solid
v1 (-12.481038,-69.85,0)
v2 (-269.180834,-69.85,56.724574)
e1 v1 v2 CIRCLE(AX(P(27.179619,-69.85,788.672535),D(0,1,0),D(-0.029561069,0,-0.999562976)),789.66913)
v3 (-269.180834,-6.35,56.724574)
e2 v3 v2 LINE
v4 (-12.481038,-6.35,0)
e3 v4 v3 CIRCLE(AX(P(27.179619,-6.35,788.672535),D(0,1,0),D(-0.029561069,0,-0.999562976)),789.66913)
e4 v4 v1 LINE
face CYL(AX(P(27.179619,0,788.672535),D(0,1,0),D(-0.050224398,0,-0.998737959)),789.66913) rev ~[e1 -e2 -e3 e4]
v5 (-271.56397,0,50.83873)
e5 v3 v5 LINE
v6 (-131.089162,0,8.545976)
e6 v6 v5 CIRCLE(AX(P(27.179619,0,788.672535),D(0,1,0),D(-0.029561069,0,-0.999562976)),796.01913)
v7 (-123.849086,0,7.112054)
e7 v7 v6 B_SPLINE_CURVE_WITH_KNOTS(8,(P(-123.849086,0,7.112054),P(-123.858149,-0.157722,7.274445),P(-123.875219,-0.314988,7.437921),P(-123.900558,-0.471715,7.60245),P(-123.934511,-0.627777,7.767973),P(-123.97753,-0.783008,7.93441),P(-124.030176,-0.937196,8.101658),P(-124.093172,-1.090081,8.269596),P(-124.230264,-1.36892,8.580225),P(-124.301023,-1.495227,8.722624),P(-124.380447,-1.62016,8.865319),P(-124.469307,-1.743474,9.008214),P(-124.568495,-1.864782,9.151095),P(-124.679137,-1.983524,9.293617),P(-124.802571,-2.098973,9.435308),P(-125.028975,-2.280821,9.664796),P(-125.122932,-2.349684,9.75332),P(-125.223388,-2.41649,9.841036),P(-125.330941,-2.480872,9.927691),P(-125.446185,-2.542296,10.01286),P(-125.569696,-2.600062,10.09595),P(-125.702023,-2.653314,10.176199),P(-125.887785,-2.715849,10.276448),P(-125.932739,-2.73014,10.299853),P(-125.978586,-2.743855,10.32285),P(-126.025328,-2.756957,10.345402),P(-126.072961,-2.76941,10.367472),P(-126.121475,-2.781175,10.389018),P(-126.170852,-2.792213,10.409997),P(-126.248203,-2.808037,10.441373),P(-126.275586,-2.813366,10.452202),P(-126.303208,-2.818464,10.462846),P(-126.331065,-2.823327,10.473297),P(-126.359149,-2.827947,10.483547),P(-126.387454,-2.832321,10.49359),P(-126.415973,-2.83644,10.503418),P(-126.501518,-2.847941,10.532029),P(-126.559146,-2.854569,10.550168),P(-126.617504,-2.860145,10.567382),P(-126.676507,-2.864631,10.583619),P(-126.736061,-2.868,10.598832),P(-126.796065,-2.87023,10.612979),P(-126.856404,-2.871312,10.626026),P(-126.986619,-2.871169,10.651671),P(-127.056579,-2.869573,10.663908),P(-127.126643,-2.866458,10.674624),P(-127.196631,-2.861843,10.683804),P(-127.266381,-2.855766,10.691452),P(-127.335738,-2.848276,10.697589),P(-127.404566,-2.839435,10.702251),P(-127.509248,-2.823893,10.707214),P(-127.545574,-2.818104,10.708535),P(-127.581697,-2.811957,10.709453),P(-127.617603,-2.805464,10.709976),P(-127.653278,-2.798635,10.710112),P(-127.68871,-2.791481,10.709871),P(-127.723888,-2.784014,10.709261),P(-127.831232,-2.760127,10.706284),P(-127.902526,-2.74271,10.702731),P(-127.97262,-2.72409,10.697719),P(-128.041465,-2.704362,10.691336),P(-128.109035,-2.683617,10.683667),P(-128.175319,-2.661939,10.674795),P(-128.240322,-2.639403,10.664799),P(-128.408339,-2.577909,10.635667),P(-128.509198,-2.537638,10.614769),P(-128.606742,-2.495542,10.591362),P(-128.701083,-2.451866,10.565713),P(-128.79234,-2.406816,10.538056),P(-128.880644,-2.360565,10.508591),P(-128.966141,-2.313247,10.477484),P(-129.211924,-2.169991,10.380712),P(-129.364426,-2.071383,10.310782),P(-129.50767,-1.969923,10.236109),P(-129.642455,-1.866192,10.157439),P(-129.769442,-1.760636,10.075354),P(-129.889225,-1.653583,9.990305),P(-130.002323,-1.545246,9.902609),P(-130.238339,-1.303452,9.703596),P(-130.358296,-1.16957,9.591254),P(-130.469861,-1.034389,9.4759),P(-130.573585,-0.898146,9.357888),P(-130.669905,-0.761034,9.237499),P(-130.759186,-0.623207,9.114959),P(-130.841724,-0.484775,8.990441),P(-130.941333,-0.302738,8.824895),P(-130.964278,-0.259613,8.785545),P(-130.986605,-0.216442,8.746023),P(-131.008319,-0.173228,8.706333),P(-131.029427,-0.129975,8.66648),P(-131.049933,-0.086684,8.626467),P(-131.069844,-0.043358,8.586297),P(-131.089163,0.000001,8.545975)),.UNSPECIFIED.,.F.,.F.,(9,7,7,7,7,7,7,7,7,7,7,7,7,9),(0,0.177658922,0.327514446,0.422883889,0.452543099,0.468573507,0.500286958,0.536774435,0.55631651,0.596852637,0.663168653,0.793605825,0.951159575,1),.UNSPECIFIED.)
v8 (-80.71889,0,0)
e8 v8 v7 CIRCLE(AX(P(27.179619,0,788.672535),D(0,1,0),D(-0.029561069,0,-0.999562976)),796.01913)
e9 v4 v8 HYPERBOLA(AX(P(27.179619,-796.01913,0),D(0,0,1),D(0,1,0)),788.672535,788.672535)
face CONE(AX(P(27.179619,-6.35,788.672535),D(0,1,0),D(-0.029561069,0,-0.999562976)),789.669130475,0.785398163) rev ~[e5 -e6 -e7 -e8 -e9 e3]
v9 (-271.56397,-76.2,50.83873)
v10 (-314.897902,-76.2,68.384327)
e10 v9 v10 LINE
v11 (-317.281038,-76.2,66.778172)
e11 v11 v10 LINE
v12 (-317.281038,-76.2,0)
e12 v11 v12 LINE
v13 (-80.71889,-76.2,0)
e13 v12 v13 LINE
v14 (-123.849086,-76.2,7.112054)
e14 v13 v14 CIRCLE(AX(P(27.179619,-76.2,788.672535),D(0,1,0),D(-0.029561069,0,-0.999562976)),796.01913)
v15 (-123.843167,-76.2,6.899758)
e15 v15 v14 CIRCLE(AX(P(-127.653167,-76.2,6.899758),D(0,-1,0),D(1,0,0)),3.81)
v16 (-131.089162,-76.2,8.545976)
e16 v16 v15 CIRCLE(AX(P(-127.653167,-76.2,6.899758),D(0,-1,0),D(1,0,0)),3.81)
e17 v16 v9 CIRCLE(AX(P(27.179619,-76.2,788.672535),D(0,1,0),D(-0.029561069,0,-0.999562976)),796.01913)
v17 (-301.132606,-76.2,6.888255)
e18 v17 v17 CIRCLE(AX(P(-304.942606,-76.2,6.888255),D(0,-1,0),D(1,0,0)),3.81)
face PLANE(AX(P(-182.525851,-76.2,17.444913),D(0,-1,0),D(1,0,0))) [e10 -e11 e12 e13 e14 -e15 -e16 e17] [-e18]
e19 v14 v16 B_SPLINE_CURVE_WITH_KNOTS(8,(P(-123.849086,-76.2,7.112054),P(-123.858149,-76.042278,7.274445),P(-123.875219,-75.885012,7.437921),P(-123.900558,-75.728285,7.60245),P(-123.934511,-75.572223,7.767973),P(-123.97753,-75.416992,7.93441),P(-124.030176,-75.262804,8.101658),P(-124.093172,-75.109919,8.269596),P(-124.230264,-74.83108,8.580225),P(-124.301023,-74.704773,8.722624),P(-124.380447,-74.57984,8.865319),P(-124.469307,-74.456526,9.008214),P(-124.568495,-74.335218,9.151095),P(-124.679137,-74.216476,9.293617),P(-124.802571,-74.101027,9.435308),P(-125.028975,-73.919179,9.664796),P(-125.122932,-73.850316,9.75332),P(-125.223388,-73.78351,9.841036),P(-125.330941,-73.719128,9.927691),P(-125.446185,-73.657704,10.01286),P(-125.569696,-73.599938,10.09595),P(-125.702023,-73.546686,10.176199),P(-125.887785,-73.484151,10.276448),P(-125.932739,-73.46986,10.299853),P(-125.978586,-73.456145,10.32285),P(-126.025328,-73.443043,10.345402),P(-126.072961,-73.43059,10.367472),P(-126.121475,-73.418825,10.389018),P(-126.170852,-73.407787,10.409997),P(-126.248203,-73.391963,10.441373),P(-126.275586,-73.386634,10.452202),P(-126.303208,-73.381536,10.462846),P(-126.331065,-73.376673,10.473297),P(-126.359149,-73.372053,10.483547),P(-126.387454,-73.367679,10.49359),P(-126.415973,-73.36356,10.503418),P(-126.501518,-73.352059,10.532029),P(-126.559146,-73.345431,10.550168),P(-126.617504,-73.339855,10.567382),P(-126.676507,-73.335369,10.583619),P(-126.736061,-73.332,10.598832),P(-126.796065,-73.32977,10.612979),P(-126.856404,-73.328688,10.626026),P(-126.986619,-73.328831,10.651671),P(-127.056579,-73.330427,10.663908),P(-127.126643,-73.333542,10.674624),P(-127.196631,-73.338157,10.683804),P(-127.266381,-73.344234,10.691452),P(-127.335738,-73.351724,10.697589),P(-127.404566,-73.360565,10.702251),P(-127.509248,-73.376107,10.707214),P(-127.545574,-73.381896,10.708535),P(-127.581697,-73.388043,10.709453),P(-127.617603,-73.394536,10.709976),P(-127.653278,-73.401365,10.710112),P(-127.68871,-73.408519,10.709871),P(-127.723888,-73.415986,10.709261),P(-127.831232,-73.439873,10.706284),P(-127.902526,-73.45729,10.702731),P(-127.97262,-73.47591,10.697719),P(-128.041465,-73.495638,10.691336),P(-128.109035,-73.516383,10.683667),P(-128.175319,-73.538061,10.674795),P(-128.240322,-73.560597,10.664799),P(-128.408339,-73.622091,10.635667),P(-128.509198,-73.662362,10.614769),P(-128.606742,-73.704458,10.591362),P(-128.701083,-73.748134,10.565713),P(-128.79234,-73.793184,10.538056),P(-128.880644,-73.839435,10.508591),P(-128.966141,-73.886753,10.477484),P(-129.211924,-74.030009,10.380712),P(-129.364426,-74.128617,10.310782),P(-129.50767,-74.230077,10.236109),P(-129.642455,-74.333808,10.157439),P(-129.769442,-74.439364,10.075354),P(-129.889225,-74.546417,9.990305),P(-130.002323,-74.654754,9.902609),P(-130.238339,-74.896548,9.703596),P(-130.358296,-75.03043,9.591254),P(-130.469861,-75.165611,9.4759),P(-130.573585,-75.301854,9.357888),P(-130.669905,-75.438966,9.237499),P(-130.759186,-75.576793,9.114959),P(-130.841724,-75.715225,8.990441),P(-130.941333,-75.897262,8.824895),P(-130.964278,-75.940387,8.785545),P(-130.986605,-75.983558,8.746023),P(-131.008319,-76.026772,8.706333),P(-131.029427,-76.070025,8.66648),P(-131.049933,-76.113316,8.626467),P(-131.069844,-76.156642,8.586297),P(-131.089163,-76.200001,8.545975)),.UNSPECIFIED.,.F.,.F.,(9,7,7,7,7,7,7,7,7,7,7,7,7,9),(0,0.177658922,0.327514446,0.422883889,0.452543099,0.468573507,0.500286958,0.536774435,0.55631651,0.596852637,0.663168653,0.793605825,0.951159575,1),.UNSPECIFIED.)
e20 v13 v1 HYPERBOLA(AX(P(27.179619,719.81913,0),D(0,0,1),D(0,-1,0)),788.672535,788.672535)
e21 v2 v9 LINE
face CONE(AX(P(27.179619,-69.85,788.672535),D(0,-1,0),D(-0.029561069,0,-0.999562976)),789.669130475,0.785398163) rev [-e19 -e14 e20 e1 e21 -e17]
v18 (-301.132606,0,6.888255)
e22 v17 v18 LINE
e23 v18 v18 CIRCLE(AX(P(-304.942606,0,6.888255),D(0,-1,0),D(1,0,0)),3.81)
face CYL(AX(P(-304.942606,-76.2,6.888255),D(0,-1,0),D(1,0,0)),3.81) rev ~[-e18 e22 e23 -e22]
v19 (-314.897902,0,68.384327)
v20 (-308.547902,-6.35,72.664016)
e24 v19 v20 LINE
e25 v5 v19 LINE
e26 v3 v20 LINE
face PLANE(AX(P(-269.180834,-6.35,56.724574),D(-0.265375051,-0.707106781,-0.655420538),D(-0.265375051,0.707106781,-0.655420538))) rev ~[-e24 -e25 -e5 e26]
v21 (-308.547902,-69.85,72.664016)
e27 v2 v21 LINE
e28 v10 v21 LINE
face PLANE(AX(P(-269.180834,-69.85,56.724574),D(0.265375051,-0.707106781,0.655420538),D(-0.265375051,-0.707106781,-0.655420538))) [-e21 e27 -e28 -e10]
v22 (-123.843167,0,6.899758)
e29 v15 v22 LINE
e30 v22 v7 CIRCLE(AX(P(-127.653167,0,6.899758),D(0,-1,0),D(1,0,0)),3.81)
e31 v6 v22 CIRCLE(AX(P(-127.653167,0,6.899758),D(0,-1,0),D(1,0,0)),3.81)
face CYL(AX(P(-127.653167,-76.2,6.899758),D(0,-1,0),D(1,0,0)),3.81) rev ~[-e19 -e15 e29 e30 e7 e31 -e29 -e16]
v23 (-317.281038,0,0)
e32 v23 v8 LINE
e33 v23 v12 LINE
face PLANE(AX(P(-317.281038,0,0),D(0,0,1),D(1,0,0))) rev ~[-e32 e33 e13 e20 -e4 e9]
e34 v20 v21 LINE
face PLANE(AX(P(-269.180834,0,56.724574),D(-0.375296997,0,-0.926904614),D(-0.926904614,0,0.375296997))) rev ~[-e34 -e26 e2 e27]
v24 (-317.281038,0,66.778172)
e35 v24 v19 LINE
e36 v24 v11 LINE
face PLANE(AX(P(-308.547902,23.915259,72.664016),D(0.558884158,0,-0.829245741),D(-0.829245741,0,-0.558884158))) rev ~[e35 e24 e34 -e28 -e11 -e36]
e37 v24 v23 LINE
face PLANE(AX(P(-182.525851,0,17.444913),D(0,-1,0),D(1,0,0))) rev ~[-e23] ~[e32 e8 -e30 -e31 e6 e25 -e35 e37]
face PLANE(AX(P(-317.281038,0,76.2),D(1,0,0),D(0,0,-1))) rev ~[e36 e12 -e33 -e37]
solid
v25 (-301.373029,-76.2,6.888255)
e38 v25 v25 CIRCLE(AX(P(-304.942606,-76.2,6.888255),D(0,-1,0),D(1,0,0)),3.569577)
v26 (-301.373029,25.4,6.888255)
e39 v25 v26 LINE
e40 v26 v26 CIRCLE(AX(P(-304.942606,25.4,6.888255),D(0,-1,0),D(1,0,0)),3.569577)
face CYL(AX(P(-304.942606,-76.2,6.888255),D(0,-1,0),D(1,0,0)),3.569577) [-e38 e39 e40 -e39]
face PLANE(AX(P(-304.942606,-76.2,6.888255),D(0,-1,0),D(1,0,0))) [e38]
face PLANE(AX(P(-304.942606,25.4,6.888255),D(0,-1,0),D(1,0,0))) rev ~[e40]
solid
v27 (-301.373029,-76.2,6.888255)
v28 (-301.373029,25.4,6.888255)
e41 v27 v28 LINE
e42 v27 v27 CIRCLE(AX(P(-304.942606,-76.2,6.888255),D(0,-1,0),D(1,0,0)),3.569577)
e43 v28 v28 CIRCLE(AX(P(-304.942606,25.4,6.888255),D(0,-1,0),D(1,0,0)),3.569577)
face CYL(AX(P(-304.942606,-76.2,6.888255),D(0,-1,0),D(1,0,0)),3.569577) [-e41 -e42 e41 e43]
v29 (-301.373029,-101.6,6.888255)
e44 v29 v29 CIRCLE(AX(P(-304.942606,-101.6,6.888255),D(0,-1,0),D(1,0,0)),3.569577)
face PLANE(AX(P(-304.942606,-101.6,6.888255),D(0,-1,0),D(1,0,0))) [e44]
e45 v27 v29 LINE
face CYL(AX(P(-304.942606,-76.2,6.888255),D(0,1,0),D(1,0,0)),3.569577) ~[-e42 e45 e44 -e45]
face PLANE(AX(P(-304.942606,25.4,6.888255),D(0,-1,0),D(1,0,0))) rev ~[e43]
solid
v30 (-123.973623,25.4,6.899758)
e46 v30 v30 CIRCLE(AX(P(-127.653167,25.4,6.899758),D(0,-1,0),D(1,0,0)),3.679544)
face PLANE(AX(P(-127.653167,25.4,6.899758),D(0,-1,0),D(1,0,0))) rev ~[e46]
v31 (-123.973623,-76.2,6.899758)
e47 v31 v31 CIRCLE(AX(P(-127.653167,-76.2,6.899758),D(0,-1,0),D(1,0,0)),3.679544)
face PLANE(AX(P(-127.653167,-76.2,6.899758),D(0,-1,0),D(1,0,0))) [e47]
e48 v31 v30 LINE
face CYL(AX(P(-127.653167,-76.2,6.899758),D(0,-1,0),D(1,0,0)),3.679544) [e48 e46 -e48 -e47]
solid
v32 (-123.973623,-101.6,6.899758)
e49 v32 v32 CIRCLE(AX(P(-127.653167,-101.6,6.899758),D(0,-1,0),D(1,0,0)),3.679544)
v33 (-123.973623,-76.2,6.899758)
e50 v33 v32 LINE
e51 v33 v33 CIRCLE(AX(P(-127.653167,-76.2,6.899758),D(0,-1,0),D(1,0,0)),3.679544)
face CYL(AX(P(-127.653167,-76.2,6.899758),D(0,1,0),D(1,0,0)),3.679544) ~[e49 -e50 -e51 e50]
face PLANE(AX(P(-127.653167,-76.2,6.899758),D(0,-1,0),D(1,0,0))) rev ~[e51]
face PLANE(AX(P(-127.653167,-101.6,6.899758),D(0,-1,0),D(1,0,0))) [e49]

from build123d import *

# Parameters (mm, degrees)
F1_DEPTH    = 76.2
F2_R        = 3.81
F3_DEPTH    = 76.2
F4_T1_DEPTH = 68.223556095
F4_T3_DEPTH = 124.0305188657
F4_T6_ANGLE = 20.3486989559
F4_T8_ANGLE = 20.3486989559
F5_R        = 3.5695769538
F6_DEPTH    = 101.6
F5_R_2      = 3.6795438925
F6_FACE_R   = 3.5695769538
F7_DEPTH    = 25.4
F8_DEPTH    = 101.6


# Not quite as in the source:
# - a fillet or chamfer that OpenCascade refuses, or shapes differently, is made with other operations: its cross-section is extruded or revolved along the edge and cut away or added


with BuildPart() as f1:
    # F0 (on Front) → F1 (new body)
    with BuildSketch(Plane.XZ):
        with BuildLine():
            Line((-317.2810375895, 0), (-12.4810375895, 0))
            ThreePointArc((-12.4810375895, 0), (-143.2080739486, 17.6048536016), (-269.1808342934, 56.7245744169))
            Line((-269.1808342934, 56.7245744169), (-317.2810375895, 76.2))
            Line((-317.2810375895, 76.2), (-317.2810375895, 0))
        make_face()
    extrude(amount=F1_DEPTH)

    # F2 (on face) → F3 (cut)
    with BuildSketch(Plane.XZ.offset(76.2)):
        with Locations((-304.942605689, 6.888254699)):
            Circle(F2_R)
        with Locations((-127.6531666517, 6.8997577764)):
            Circle(F2_R)
    extrude(amount=-F3_DEPTH, mode=Mode.SUBTRACT)

    # F4: chamfer of 6.35 on 5 edges, made by hand

    # F4_s2 → F4_t1 (cut)
    with BuildSketch(Plane(origin=(-250.9997630926, 0, 101.6279947383), x_dir=(0, 1, 0), z_dir=(-0.9269046144, 0, 0.3752969968))):
        Polygon((-6.35, 48.4444889184), (0, 54.7944889184), (0, 48.4444889184), align=None)
        Polygon((-69.85, 48.4444889184), (-76.2, 54.7944889184), (-76.2, 48.4444889184), align=None)
    extrude(amount=F4_T1_DEPTH, mode=Mode.SUBTRACT)

    # F4_s4 → F4_t3 (cut)
    with BuildSketch(Plane.XZ.offset(-23.9152594329)):
        Polygon((-308.5479016601, 72.6640162152), (-317.2810375895, 66.7781719137), (-317.2810375895, 76.2), align=None)
    extrude(amount=F4_T3_DEPTH, mode=Mode.SUBTRACT)

    # F4_s5 → F4_t6 (revolve, cut)
    with BuildSketch(Plane(origin=(3.8520530857, 0, -0.1139205939), x_dir=(0, 1, 0), z_dir=(0.9995629761, 0, -0.0295610692))):
        Polygon((-69.85, -0.5378053162), (-76.2, -6.8878053162), (-76.2, -0.5378053162), align=None)
    revolve(axis=Axis((27.1796188092, -76.2, 788.6725353144), (0, 1, 0)), revolution_arc=F4_T6_ANGLE, mode=Mode.SUBTRACT)

    # F4_s7 → F4_t8 (revolve, cut)
    with BuildSketch(Plane(origin=(3.8520530857, 0, -0.1139205939), x_dir=(0, 1, 0), z_dir=(0.9995629761, 0, -0.0295610692))):
        Polygon((-6.35, -0.5378053162), (0, -6.8878053162), (0, -0.5378053162), align=None)
    revolve(axis=Axis((27.1796188092, 0, 788.6725353144), (0, 1, 0)), revolution_arc=F4_T8_ANGLE, mode=Mode.SUBTRACT)


with BuildPart() as f6:
    # F5 (on face) → F6 (new body)
    with BuildSketch(Plane.XZ.offset(76.2)):
        with Locations((-304.942605689, 6.888254699)):
            Circle(F5_R)
    extrude(amount=-F6_DEPTH)

    # F5 (on face) + F6_face (on face) → F7 (join)
    with BuildSketch(Plane.XZ.offset(76.2)):
        with Locations((-304.942605689, 6.888254699)):
            Circle(F5_R)
        with Locations((-127.6531666517, 6.8997577764)):
            Circle(F5_R_2)
    with BuildSketch(Plane(origin=(-304.942605689, -76.2, 6.888254699), x_dir=(1, 0, 0), z_dir=(0, -1, 0))):
        Circle(F6_FACE_R)
    extrude(amount=F7_DEPTH)


with BuildPart() as f8:
    # F5 (on face) → F8 (new body)
    with BuildSketch(Plane.XZ.offset(76.2)):
        with Locations((-304.942605689, 6.888254699)):
            Circle(F5_R)
    extrude(amount=-F8_DEPTH)


with BuildPart() as f8b:
    # F5 (on face) → F8, piece 2 (new body)
    with BuildSketch(Plane.XZ.offset(76.2)):
        with Locations((-127.6531666517, 6.8997577764)):
            Circle(F5_R_2)
    extrude(amount=-F8_DEPTH)


solid = Compound([f1.part, f6.part, f8.part, f8b.part])
